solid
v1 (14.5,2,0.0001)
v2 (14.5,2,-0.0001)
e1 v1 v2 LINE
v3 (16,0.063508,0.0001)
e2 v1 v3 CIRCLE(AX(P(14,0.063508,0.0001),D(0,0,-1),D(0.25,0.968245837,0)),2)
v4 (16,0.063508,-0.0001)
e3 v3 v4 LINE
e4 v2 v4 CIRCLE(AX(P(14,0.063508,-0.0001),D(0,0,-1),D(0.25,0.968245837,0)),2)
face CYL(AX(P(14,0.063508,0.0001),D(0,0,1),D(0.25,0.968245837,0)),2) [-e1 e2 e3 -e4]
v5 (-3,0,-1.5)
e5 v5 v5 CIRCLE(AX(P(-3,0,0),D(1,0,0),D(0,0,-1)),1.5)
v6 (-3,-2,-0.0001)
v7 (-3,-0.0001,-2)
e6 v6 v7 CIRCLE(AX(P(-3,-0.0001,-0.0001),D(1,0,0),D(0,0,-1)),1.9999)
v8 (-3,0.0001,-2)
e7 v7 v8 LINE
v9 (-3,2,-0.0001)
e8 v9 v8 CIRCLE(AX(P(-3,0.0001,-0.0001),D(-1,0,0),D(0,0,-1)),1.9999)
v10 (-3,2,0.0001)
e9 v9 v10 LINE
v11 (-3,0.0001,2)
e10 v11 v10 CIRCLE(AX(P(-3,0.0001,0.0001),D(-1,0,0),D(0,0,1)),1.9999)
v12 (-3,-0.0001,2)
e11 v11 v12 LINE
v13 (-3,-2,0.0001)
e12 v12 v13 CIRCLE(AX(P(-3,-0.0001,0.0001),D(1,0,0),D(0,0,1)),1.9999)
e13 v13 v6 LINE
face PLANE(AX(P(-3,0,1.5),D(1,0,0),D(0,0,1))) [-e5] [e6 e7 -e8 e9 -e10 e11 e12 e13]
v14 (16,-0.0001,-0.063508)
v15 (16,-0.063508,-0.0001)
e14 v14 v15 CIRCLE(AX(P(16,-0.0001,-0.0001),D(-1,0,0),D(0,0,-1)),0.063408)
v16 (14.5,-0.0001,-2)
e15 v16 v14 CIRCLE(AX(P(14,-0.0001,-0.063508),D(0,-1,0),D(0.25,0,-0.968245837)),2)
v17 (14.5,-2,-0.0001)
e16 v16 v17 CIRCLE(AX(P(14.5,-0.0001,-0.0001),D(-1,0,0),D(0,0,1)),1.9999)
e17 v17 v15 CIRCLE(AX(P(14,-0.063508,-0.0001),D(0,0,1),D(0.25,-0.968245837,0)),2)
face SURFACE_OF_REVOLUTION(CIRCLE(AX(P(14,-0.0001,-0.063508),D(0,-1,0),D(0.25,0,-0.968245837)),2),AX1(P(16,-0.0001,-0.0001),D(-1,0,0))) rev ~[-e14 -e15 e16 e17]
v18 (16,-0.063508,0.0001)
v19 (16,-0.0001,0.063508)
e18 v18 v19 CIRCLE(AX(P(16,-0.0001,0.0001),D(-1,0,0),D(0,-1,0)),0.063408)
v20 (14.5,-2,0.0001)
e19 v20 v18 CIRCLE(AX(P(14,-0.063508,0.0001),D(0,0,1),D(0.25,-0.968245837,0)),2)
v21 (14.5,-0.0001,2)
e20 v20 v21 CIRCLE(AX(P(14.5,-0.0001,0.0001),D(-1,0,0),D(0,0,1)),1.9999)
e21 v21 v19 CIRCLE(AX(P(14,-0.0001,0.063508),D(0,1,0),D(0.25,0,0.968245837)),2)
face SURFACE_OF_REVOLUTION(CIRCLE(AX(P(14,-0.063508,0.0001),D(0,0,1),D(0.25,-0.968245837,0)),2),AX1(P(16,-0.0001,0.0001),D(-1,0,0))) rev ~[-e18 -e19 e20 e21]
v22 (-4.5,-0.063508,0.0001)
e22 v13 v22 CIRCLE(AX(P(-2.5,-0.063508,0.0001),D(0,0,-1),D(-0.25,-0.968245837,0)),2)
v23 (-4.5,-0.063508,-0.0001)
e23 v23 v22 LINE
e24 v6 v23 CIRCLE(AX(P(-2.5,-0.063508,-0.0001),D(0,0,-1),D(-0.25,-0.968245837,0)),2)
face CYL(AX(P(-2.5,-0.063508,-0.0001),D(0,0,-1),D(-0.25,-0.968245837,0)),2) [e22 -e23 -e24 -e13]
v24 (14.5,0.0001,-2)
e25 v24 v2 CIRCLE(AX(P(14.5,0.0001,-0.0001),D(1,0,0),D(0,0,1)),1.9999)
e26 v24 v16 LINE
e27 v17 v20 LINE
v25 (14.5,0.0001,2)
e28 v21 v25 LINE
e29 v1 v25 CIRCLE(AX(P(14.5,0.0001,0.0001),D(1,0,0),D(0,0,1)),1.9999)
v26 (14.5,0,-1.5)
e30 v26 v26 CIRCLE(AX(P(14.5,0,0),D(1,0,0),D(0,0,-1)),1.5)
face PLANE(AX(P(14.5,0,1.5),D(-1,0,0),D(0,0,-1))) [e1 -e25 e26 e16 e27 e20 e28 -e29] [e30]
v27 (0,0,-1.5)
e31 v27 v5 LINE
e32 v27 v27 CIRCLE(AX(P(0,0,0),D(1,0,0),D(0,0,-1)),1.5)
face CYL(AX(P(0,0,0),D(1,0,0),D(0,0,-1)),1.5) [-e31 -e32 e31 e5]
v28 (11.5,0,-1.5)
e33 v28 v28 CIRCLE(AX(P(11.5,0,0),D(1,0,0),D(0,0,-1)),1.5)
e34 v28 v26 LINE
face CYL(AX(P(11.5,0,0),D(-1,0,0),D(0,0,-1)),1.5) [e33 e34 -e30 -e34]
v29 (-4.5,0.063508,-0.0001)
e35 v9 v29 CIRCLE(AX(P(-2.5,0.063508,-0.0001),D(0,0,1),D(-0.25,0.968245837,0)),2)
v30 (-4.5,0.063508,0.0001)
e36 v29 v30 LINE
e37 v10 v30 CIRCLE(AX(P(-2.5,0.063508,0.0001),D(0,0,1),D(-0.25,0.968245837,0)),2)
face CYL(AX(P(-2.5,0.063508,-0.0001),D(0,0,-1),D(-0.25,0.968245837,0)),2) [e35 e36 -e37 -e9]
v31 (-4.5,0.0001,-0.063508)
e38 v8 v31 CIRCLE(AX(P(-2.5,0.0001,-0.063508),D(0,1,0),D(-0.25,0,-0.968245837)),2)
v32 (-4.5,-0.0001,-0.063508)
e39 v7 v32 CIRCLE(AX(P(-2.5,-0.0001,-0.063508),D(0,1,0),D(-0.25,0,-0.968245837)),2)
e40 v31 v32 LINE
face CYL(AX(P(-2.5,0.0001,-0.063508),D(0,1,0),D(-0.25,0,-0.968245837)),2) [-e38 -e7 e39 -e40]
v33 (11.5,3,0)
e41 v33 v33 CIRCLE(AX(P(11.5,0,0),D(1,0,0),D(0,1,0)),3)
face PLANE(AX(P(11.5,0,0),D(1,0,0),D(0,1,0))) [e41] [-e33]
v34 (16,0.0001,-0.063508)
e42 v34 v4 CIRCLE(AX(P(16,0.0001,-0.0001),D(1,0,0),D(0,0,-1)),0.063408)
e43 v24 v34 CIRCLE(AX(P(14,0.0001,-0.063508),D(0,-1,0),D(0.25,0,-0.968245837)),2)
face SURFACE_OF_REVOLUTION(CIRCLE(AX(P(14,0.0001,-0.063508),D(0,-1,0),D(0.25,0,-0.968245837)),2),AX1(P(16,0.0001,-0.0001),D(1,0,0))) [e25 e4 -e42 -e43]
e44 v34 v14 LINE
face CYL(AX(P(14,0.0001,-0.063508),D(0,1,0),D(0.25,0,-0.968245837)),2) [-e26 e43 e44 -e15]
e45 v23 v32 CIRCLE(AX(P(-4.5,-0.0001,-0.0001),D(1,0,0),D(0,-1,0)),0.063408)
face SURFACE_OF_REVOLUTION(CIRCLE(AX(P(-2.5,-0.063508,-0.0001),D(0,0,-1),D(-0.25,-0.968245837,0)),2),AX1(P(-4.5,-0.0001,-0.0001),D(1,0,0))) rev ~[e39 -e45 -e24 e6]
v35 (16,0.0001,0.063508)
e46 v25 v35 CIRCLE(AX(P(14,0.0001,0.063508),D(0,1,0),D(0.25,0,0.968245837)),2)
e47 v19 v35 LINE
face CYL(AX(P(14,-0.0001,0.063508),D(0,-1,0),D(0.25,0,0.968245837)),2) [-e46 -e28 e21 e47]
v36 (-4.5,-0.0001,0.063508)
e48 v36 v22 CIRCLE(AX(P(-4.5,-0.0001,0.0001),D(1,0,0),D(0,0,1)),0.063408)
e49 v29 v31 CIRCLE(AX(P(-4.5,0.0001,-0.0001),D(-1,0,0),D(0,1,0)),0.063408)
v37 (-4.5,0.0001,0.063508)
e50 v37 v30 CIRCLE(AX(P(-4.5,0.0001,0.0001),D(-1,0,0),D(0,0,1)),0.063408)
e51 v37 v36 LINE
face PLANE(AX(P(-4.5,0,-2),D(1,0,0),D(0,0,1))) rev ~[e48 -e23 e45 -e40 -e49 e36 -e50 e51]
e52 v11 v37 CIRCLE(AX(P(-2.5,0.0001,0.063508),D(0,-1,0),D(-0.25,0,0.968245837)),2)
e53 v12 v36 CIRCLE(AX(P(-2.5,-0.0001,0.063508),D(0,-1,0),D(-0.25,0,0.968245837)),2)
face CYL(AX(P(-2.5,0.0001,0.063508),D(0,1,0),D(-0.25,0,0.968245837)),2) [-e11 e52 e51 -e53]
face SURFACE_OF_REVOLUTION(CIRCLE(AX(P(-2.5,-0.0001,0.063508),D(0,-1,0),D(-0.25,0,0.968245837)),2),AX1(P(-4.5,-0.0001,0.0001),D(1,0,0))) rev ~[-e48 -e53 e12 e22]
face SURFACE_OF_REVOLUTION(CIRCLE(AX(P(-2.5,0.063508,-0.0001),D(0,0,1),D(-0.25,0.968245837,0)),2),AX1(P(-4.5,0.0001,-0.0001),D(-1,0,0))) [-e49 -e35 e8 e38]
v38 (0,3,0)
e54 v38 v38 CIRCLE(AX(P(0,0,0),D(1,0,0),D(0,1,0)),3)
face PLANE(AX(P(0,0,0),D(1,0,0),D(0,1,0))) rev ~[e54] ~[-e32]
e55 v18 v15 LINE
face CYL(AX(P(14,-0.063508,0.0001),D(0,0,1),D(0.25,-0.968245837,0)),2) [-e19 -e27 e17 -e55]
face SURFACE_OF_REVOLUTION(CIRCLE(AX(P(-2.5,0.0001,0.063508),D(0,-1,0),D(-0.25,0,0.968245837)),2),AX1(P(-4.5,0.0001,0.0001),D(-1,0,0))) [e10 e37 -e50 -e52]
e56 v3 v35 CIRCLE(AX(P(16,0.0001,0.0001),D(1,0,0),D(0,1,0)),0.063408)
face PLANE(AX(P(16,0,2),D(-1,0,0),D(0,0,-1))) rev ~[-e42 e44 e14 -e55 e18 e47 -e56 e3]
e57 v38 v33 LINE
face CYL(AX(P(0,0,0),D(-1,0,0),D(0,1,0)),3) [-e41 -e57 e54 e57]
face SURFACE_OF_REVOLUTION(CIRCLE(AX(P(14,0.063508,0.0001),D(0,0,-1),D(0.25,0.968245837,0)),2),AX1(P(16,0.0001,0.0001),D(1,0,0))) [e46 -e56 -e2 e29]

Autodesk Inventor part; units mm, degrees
ref_plane "XZ Plane" through (0, 0, 0) normal (0, 1, 0) x (-1, 0, 0)
ref_plane "XY Plane" through (0, 0, 0) normal (0, 0, 1) x (1, 0, 0)
sketch "Sketch1" plane through (0, 0, 0) normal (1, 0, 0) x (0, 1, 0)
  circle A0 centre (0, 0) radius 3
  dimension "d0" = 6
extrude "Extrusion1" add sketch "Sketch1" along normal blind 11.5
sketch "Sketch2" plane through (11.5, 0, 0) normal (1, 0, 0) x (0, 0, -1)
  circle A0 centre (0, 0) radius 1.5
  dimension "d3" = 3
extrude "Extrusion2" add sketch "Sketch2" along normal blind 3
sketch "Sketch3" plane through (0, 0, 0) normal (0, 1, 0) x (-1, 0, 0)
  line L0 (-14.5, 1.5) -> (-14.5, -1.5) projected
  line L1 (-14.5, 0) -> (-14.5, 2)
  line L2 (-14.5, 0) -> (-14.5, -2)
  line L3 (-14.5, -2) -> (-16, -2)
  line L4 (-14.5, 2) -> (-16, 2)
  line L5 (-16, 2) -> (-16, -2)
  point P0 (0, 0)
  dimension "d6" = 2
  dimension "d7" = 2
  dimension "d8" = 1.5
extrude "Extrusion3" add sketch "Sketch3" along normal mid plane 4
fillet "Fillet1" radius 2 4 edges at (15.25, 2, -2) (15.25, 2, 2) (15.25, -2, 2) (15.25, -2, -2)
fillet "Fillet2" radius 2 3 edges at (16, 0, -2) (16, 1.4142, -1.4142) (16, 2, 0)
ref_plane "Work Plane1" through (5.75, 0, 0) normal (1, 0, 0) x (0, 1, 0)
mirror "Mirror1" about plane through (5.75, 0, 0) normal (1, 0, 0) of "Extrusion2"
sketch "Sketch4" plane through (0, 0, 0) normal (0, 1, 0) x (-1, 0, 0)
  line L0 (3, 1.5) -> (3, -1.5) projected
  line L1 (3, 0) -> (3, 2)
  line L2 (3, 2) -> (3, -2)
  line L3 (3, -2) -> (4.5, -2)
  line L4 (4.5, -2) -> (4.5, 2)
  line L5 (4.5, 2) -> (3, 2)
  point P0 (0, 0)
  dimension "d14" = 2
  dimension "d15" = 4
  dimension "d16" = 1.5
extrude "Extrusion4" add sketch "Sketch4" along normal mid plane 4
fillet "Fillet3" radius 2 4 edges at (-3.75, 2, 2) (-3.75, 2, -2) (-3.75, -2, 2) (-3.75, -2, -2)
fillet "Fillet4" radius 2 3 edges at (-4.5, 0, 2) (-4.5, 2, 0) (-4.5, 1.4142, 1.4142)
properties part number "Reverse Gear LInk Rod" material "Copper"
